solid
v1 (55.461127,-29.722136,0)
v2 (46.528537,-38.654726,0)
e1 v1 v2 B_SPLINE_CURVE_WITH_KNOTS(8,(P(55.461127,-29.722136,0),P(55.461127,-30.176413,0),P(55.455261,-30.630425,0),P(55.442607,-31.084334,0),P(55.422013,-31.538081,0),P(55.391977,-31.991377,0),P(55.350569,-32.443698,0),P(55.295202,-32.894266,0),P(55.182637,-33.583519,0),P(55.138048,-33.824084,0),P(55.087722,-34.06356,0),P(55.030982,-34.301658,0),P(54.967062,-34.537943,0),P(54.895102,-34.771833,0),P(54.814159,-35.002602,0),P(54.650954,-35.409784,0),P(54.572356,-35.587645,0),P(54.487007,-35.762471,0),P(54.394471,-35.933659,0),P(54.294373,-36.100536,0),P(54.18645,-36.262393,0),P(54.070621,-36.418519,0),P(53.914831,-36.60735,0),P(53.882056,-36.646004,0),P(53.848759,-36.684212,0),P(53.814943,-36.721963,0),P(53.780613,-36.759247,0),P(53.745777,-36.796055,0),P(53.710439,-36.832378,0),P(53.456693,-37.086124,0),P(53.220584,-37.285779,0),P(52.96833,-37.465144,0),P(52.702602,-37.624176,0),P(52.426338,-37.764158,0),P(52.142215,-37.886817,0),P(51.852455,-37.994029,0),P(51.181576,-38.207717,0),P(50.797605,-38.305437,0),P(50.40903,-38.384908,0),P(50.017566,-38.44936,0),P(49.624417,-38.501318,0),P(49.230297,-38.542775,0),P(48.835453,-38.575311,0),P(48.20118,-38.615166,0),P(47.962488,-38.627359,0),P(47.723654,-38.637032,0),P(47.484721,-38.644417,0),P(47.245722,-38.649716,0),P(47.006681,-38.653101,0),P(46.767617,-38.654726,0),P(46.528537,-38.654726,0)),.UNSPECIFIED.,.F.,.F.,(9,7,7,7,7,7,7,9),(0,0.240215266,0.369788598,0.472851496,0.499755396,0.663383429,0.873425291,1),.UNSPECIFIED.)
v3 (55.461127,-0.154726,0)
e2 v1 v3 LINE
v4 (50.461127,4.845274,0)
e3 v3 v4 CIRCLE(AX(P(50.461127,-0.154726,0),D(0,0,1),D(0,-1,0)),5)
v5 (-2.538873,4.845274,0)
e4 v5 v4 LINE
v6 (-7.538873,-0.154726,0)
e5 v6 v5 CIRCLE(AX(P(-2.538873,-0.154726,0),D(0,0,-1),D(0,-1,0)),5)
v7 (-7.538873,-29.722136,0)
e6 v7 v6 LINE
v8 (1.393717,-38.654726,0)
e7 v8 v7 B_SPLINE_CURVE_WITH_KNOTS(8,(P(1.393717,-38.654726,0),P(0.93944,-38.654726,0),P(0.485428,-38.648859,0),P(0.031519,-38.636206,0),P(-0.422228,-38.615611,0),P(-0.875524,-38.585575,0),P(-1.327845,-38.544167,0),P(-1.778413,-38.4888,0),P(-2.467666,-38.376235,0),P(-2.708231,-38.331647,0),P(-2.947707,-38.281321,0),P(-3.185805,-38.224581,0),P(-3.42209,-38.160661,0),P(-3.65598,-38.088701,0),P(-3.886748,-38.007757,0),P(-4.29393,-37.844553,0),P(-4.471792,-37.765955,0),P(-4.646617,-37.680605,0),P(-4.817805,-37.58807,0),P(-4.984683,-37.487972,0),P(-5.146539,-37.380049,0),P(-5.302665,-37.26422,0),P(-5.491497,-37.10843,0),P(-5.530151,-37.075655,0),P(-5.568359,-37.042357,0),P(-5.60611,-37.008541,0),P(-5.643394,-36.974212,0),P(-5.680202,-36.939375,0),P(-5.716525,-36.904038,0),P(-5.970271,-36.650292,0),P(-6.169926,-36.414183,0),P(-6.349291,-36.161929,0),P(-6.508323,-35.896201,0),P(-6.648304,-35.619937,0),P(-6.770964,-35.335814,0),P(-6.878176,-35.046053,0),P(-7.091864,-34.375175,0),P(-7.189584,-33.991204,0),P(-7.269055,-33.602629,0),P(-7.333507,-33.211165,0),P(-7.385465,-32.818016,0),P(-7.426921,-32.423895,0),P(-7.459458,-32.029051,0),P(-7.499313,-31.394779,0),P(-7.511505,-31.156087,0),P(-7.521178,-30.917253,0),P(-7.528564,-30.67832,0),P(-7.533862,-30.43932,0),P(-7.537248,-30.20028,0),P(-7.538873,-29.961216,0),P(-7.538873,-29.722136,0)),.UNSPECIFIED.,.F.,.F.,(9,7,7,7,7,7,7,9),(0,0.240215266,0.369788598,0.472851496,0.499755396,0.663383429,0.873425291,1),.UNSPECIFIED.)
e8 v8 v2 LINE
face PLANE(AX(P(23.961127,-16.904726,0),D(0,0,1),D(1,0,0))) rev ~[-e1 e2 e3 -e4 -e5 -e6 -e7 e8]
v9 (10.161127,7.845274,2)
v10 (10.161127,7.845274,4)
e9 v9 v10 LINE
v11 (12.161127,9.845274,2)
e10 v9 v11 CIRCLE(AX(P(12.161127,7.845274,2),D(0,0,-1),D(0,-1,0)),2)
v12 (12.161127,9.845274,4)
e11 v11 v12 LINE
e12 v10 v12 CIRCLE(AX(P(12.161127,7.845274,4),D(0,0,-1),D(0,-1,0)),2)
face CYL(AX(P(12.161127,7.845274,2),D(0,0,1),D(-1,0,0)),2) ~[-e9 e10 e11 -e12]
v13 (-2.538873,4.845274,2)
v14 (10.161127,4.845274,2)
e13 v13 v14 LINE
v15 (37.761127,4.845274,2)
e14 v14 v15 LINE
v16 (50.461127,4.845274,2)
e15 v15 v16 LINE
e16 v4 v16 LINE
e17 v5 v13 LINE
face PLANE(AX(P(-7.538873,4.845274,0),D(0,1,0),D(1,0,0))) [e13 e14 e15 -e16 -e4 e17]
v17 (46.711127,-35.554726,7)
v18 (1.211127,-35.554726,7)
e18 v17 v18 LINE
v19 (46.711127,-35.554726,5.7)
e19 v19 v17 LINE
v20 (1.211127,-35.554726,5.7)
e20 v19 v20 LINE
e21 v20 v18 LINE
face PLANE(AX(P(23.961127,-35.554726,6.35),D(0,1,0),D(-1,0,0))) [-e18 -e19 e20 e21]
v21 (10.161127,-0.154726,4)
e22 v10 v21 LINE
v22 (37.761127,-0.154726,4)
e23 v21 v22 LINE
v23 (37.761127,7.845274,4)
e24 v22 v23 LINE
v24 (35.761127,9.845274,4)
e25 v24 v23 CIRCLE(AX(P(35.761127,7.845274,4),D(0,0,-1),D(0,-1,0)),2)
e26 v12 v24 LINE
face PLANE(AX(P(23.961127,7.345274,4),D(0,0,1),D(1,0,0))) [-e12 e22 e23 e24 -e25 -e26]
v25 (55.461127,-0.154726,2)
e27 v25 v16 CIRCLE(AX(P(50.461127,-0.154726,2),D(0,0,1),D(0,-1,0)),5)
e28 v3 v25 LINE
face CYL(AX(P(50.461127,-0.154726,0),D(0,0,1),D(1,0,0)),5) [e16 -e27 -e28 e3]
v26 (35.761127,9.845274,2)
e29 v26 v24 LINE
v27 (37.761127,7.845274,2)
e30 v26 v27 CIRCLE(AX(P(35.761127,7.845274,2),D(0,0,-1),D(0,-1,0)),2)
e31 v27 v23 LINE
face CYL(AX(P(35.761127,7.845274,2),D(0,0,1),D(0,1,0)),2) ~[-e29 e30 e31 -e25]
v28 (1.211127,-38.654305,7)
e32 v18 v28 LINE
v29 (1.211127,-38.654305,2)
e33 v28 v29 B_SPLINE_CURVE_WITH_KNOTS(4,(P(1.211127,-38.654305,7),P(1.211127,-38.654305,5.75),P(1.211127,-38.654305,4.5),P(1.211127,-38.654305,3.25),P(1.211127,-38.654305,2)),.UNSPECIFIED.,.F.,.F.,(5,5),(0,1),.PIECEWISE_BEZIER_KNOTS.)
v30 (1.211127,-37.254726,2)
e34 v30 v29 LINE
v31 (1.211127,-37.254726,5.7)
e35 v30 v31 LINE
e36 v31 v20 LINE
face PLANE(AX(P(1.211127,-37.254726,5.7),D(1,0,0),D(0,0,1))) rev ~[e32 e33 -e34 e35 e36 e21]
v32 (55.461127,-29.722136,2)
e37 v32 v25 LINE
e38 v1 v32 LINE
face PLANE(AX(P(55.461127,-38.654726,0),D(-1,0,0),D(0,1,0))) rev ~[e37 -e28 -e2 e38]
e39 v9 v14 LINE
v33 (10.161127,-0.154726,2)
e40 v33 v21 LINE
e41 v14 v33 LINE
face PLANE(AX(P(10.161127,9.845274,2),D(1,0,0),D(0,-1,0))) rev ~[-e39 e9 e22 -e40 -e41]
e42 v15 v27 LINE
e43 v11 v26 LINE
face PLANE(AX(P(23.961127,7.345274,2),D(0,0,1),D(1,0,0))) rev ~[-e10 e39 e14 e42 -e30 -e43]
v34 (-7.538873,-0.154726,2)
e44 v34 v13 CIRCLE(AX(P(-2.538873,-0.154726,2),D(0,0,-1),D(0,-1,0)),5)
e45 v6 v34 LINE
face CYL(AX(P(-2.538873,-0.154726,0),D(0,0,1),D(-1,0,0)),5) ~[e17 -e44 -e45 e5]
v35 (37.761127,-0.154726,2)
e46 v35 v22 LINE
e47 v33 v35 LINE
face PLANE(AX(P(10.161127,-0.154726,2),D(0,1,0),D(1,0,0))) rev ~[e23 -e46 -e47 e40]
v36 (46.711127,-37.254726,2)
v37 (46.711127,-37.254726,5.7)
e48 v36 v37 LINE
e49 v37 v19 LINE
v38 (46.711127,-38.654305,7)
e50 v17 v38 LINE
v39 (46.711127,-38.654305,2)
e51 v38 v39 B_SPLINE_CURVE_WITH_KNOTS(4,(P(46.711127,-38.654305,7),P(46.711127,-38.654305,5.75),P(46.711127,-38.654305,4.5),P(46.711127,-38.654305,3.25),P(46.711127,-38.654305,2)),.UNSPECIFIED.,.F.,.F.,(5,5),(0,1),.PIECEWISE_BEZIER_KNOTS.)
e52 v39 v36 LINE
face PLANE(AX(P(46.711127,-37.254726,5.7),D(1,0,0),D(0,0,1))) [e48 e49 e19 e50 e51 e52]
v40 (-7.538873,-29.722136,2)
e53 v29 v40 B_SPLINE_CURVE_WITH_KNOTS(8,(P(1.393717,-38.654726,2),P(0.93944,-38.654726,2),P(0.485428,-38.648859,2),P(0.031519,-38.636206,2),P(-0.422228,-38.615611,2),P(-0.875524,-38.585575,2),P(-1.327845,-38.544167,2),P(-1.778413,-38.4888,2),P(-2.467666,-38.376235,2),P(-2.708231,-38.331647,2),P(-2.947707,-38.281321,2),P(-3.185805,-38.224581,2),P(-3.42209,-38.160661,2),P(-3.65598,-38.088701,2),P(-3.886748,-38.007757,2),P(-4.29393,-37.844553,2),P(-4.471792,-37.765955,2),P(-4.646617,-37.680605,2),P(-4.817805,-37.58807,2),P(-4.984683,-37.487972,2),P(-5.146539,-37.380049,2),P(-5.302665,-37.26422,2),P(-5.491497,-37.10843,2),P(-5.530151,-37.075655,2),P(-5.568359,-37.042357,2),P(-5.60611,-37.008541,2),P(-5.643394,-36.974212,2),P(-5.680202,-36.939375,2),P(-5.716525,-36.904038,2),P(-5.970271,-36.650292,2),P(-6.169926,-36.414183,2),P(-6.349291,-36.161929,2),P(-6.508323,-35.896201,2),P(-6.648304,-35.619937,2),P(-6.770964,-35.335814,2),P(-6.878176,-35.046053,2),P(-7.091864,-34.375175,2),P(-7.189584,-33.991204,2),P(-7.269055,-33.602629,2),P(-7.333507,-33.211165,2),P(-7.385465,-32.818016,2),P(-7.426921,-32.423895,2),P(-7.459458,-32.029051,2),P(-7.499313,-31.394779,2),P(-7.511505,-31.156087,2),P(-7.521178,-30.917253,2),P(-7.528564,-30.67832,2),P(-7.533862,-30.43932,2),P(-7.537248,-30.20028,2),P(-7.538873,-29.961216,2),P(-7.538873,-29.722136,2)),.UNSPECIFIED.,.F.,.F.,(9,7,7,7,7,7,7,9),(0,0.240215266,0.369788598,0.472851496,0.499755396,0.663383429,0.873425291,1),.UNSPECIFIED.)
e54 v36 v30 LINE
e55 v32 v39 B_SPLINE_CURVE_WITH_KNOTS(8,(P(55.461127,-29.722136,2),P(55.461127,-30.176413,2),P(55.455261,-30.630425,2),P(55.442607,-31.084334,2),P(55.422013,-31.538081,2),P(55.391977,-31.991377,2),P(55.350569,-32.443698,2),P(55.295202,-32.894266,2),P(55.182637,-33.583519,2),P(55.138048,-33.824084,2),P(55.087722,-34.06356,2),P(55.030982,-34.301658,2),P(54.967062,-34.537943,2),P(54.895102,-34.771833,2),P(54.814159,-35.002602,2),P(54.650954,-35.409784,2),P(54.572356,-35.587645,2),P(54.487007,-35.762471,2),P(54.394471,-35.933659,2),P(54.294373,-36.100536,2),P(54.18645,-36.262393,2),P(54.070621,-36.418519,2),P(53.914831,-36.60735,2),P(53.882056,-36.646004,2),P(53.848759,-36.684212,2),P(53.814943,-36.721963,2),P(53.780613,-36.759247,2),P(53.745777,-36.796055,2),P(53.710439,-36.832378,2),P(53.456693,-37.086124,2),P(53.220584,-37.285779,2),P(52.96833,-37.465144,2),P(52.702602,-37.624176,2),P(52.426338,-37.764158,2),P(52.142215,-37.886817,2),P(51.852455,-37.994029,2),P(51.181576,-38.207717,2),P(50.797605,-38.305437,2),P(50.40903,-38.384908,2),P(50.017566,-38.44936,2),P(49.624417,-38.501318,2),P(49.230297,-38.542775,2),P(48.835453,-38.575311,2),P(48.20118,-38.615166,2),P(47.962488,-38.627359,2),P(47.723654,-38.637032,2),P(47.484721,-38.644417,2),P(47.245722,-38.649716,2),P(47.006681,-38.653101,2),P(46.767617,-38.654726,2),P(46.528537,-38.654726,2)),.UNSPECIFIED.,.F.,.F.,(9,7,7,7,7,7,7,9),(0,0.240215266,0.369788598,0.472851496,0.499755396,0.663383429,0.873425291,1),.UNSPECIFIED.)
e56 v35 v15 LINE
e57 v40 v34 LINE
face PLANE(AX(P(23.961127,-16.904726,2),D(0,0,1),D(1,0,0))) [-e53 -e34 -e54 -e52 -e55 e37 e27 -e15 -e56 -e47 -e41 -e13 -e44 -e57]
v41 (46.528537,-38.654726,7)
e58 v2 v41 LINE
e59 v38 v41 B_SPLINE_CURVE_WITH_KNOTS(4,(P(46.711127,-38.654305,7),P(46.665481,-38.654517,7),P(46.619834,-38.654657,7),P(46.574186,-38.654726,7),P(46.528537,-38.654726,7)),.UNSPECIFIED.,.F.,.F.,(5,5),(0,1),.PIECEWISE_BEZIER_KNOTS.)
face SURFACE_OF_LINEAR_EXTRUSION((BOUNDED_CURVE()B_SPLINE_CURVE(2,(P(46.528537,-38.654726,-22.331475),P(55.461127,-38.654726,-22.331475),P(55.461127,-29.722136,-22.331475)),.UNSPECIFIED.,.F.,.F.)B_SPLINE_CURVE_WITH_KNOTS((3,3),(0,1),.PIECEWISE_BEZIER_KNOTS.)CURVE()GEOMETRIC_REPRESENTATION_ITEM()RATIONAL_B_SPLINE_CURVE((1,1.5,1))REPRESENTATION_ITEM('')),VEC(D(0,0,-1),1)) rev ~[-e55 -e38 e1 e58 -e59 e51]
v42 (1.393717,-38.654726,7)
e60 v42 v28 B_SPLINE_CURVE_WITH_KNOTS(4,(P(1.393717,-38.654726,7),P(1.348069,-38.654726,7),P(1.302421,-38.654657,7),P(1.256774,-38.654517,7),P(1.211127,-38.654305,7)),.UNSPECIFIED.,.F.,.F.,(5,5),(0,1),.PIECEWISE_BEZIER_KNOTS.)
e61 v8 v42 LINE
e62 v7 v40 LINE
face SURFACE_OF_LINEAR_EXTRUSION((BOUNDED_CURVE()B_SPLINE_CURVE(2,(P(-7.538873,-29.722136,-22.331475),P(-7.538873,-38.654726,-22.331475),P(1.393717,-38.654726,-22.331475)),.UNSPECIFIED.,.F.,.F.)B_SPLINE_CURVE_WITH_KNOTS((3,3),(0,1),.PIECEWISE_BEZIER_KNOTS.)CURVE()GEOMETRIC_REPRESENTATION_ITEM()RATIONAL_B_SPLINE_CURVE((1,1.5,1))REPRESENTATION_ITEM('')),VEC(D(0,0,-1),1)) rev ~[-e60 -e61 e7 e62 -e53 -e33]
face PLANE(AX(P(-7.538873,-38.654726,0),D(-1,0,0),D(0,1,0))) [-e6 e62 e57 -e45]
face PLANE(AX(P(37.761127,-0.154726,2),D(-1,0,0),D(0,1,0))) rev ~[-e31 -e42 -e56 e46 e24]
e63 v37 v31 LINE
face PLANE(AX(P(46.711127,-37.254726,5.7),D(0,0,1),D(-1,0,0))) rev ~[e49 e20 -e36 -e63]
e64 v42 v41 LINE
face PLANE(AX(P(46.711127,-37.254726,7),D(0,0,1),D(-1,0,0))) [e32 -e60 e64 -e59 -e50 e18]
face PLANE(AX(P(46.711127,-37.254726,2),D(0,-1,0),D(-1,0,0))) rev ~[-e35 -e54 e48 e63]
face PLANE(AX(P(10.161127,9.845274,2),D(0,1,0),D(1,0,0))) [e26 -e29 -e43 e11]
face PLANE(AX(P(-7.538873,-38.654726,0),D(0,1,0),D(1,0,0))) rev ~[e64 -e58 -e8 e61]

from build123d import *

# Parameters (mm, degrees)
F0_W        = 63
F0_H        = 43.5
F1_DEPTH    = 2
F2_R        = 5
F3_W        = 27.6
F3_H        = 5
F4_DEPTH    = 2
F5_R        = 2
F6_DEPTH    = 5
F7_W        = 45.5
F7_H        = 1.3
F8_DEPTH    = 1.7
F9_T1_DEPTH = 46.6629509039


# Not quite as in the source:
# - a fillet or chamfer that OpenCascade refuses, or shapes differently, is made with other operations: its cross-section is extruded or revolved along the edge and cut away or added


with BuildPart() as f1:
    # F0 (on Top) → F1 (new body)
    with BuildSketch(Plane.XY):
        with Locations((23.961127311, -16.9047259986)):
            Rectangle(F0_W, F0_H)
    extrude(amount=F1_DEPTH)

    # F2
    f2_edges = [f1.edges().sort_by_distance(p)[0] for p in [
        (-7.538873, 4.845274, 1),
        (55.461127, 4.845274, 1),
    ]]
    fillet(f2_edges, radius=F2_R)

    # F3 (on face) → F4 (join)
    with BuildSketch(Plane.XY.offset(2)):
        with Locations((23.961127311, 7.3452740014)):
            Rectangle(F3_W, F3_H)
        Polygon((10.161127311, -0.1547259986), (23.961127311, -0.1547259986), (37.761127311, -0.1547259986), (37.761127311, 4.8452740014), (10.161127311, 4.8452740014), align=None)
    extrude(amount=F4_DEPTH)

    # F5
    f5_edges = [f1.edges().sort_by_distance(p)[0] for p in [
        (10.161127, 9.845274, 3),
        (37.761127, 9.845274, 3),
    ]]
    fillet(f5_edges, radius=F5_R)

    # F3 (on face) → F6 (join)
    with BuildSketch(Plane.XY.offset(2)):
        Polygon((1.211127311, -37.2547259986), (1.211127311, -38.6547259986), (23.961127311, -38.6547259986), (46.711127311, -38.6547259986), (46.711127311, -37.2547259986), align=None)
    extrude(amount=F6_DEPTH)

    # F7 (on face) → F8 (join)
    with BuildSketch(Plane(origin=(0, -37.2547259986, 0), x_dir=(-1, 0, 0), z_dir=(0, 1, 0))):
        with Locations((-23.961127311, 6.35)):
            Rectangle(F7_W, F7_H)
    extrude(amount=F8_DEPTH)

    # F9: fillet of radius 8.9325901808 on 2 edges, made by hand

    # F9_s2 → F9_t1 (cut)
    with BuildSketch(Plane.XY.offset(-22.331475452)):
        with BuildLine():
            add(Edge.make_bspline(
                [(46.5285371302, -38.6547259986), (55.461127311, -38.6547259986), (55.461127311, -29.7221358179)],
                knots=[0, 0, 0, 1, 1, 1], degree=2, weights=[1, 1.5, 1]))
            Line((55.461127311, -29.7221358179), (55.461127311, -38.6547259986))
            Line((55.461127311, -38.6547259986), (46.5285371302, -38.6547259986))
        make_face()
        with BuildLine():
            add(Edge.make_bspline(
                [(-7.538872689, -29.7221358179), (-7.538872689, -38.6547259986), (1.3937174918, -38.6547259986)],
                knots=[0, 0, 0, 1, 1, 1], degree=2, weights=[1, 1.5, 1]))
            Line((1.3937174918, -38.6547259986), (-7.538872689, -38.6547259986))
            Line((-7.538872689, -38.6547259986), (-7.538872689, -29.7221358179))
        make_face()
    extrude(amount=F9_T1_DEPTH, mode=Mode.SUBTRACT)


solid = f1.part
